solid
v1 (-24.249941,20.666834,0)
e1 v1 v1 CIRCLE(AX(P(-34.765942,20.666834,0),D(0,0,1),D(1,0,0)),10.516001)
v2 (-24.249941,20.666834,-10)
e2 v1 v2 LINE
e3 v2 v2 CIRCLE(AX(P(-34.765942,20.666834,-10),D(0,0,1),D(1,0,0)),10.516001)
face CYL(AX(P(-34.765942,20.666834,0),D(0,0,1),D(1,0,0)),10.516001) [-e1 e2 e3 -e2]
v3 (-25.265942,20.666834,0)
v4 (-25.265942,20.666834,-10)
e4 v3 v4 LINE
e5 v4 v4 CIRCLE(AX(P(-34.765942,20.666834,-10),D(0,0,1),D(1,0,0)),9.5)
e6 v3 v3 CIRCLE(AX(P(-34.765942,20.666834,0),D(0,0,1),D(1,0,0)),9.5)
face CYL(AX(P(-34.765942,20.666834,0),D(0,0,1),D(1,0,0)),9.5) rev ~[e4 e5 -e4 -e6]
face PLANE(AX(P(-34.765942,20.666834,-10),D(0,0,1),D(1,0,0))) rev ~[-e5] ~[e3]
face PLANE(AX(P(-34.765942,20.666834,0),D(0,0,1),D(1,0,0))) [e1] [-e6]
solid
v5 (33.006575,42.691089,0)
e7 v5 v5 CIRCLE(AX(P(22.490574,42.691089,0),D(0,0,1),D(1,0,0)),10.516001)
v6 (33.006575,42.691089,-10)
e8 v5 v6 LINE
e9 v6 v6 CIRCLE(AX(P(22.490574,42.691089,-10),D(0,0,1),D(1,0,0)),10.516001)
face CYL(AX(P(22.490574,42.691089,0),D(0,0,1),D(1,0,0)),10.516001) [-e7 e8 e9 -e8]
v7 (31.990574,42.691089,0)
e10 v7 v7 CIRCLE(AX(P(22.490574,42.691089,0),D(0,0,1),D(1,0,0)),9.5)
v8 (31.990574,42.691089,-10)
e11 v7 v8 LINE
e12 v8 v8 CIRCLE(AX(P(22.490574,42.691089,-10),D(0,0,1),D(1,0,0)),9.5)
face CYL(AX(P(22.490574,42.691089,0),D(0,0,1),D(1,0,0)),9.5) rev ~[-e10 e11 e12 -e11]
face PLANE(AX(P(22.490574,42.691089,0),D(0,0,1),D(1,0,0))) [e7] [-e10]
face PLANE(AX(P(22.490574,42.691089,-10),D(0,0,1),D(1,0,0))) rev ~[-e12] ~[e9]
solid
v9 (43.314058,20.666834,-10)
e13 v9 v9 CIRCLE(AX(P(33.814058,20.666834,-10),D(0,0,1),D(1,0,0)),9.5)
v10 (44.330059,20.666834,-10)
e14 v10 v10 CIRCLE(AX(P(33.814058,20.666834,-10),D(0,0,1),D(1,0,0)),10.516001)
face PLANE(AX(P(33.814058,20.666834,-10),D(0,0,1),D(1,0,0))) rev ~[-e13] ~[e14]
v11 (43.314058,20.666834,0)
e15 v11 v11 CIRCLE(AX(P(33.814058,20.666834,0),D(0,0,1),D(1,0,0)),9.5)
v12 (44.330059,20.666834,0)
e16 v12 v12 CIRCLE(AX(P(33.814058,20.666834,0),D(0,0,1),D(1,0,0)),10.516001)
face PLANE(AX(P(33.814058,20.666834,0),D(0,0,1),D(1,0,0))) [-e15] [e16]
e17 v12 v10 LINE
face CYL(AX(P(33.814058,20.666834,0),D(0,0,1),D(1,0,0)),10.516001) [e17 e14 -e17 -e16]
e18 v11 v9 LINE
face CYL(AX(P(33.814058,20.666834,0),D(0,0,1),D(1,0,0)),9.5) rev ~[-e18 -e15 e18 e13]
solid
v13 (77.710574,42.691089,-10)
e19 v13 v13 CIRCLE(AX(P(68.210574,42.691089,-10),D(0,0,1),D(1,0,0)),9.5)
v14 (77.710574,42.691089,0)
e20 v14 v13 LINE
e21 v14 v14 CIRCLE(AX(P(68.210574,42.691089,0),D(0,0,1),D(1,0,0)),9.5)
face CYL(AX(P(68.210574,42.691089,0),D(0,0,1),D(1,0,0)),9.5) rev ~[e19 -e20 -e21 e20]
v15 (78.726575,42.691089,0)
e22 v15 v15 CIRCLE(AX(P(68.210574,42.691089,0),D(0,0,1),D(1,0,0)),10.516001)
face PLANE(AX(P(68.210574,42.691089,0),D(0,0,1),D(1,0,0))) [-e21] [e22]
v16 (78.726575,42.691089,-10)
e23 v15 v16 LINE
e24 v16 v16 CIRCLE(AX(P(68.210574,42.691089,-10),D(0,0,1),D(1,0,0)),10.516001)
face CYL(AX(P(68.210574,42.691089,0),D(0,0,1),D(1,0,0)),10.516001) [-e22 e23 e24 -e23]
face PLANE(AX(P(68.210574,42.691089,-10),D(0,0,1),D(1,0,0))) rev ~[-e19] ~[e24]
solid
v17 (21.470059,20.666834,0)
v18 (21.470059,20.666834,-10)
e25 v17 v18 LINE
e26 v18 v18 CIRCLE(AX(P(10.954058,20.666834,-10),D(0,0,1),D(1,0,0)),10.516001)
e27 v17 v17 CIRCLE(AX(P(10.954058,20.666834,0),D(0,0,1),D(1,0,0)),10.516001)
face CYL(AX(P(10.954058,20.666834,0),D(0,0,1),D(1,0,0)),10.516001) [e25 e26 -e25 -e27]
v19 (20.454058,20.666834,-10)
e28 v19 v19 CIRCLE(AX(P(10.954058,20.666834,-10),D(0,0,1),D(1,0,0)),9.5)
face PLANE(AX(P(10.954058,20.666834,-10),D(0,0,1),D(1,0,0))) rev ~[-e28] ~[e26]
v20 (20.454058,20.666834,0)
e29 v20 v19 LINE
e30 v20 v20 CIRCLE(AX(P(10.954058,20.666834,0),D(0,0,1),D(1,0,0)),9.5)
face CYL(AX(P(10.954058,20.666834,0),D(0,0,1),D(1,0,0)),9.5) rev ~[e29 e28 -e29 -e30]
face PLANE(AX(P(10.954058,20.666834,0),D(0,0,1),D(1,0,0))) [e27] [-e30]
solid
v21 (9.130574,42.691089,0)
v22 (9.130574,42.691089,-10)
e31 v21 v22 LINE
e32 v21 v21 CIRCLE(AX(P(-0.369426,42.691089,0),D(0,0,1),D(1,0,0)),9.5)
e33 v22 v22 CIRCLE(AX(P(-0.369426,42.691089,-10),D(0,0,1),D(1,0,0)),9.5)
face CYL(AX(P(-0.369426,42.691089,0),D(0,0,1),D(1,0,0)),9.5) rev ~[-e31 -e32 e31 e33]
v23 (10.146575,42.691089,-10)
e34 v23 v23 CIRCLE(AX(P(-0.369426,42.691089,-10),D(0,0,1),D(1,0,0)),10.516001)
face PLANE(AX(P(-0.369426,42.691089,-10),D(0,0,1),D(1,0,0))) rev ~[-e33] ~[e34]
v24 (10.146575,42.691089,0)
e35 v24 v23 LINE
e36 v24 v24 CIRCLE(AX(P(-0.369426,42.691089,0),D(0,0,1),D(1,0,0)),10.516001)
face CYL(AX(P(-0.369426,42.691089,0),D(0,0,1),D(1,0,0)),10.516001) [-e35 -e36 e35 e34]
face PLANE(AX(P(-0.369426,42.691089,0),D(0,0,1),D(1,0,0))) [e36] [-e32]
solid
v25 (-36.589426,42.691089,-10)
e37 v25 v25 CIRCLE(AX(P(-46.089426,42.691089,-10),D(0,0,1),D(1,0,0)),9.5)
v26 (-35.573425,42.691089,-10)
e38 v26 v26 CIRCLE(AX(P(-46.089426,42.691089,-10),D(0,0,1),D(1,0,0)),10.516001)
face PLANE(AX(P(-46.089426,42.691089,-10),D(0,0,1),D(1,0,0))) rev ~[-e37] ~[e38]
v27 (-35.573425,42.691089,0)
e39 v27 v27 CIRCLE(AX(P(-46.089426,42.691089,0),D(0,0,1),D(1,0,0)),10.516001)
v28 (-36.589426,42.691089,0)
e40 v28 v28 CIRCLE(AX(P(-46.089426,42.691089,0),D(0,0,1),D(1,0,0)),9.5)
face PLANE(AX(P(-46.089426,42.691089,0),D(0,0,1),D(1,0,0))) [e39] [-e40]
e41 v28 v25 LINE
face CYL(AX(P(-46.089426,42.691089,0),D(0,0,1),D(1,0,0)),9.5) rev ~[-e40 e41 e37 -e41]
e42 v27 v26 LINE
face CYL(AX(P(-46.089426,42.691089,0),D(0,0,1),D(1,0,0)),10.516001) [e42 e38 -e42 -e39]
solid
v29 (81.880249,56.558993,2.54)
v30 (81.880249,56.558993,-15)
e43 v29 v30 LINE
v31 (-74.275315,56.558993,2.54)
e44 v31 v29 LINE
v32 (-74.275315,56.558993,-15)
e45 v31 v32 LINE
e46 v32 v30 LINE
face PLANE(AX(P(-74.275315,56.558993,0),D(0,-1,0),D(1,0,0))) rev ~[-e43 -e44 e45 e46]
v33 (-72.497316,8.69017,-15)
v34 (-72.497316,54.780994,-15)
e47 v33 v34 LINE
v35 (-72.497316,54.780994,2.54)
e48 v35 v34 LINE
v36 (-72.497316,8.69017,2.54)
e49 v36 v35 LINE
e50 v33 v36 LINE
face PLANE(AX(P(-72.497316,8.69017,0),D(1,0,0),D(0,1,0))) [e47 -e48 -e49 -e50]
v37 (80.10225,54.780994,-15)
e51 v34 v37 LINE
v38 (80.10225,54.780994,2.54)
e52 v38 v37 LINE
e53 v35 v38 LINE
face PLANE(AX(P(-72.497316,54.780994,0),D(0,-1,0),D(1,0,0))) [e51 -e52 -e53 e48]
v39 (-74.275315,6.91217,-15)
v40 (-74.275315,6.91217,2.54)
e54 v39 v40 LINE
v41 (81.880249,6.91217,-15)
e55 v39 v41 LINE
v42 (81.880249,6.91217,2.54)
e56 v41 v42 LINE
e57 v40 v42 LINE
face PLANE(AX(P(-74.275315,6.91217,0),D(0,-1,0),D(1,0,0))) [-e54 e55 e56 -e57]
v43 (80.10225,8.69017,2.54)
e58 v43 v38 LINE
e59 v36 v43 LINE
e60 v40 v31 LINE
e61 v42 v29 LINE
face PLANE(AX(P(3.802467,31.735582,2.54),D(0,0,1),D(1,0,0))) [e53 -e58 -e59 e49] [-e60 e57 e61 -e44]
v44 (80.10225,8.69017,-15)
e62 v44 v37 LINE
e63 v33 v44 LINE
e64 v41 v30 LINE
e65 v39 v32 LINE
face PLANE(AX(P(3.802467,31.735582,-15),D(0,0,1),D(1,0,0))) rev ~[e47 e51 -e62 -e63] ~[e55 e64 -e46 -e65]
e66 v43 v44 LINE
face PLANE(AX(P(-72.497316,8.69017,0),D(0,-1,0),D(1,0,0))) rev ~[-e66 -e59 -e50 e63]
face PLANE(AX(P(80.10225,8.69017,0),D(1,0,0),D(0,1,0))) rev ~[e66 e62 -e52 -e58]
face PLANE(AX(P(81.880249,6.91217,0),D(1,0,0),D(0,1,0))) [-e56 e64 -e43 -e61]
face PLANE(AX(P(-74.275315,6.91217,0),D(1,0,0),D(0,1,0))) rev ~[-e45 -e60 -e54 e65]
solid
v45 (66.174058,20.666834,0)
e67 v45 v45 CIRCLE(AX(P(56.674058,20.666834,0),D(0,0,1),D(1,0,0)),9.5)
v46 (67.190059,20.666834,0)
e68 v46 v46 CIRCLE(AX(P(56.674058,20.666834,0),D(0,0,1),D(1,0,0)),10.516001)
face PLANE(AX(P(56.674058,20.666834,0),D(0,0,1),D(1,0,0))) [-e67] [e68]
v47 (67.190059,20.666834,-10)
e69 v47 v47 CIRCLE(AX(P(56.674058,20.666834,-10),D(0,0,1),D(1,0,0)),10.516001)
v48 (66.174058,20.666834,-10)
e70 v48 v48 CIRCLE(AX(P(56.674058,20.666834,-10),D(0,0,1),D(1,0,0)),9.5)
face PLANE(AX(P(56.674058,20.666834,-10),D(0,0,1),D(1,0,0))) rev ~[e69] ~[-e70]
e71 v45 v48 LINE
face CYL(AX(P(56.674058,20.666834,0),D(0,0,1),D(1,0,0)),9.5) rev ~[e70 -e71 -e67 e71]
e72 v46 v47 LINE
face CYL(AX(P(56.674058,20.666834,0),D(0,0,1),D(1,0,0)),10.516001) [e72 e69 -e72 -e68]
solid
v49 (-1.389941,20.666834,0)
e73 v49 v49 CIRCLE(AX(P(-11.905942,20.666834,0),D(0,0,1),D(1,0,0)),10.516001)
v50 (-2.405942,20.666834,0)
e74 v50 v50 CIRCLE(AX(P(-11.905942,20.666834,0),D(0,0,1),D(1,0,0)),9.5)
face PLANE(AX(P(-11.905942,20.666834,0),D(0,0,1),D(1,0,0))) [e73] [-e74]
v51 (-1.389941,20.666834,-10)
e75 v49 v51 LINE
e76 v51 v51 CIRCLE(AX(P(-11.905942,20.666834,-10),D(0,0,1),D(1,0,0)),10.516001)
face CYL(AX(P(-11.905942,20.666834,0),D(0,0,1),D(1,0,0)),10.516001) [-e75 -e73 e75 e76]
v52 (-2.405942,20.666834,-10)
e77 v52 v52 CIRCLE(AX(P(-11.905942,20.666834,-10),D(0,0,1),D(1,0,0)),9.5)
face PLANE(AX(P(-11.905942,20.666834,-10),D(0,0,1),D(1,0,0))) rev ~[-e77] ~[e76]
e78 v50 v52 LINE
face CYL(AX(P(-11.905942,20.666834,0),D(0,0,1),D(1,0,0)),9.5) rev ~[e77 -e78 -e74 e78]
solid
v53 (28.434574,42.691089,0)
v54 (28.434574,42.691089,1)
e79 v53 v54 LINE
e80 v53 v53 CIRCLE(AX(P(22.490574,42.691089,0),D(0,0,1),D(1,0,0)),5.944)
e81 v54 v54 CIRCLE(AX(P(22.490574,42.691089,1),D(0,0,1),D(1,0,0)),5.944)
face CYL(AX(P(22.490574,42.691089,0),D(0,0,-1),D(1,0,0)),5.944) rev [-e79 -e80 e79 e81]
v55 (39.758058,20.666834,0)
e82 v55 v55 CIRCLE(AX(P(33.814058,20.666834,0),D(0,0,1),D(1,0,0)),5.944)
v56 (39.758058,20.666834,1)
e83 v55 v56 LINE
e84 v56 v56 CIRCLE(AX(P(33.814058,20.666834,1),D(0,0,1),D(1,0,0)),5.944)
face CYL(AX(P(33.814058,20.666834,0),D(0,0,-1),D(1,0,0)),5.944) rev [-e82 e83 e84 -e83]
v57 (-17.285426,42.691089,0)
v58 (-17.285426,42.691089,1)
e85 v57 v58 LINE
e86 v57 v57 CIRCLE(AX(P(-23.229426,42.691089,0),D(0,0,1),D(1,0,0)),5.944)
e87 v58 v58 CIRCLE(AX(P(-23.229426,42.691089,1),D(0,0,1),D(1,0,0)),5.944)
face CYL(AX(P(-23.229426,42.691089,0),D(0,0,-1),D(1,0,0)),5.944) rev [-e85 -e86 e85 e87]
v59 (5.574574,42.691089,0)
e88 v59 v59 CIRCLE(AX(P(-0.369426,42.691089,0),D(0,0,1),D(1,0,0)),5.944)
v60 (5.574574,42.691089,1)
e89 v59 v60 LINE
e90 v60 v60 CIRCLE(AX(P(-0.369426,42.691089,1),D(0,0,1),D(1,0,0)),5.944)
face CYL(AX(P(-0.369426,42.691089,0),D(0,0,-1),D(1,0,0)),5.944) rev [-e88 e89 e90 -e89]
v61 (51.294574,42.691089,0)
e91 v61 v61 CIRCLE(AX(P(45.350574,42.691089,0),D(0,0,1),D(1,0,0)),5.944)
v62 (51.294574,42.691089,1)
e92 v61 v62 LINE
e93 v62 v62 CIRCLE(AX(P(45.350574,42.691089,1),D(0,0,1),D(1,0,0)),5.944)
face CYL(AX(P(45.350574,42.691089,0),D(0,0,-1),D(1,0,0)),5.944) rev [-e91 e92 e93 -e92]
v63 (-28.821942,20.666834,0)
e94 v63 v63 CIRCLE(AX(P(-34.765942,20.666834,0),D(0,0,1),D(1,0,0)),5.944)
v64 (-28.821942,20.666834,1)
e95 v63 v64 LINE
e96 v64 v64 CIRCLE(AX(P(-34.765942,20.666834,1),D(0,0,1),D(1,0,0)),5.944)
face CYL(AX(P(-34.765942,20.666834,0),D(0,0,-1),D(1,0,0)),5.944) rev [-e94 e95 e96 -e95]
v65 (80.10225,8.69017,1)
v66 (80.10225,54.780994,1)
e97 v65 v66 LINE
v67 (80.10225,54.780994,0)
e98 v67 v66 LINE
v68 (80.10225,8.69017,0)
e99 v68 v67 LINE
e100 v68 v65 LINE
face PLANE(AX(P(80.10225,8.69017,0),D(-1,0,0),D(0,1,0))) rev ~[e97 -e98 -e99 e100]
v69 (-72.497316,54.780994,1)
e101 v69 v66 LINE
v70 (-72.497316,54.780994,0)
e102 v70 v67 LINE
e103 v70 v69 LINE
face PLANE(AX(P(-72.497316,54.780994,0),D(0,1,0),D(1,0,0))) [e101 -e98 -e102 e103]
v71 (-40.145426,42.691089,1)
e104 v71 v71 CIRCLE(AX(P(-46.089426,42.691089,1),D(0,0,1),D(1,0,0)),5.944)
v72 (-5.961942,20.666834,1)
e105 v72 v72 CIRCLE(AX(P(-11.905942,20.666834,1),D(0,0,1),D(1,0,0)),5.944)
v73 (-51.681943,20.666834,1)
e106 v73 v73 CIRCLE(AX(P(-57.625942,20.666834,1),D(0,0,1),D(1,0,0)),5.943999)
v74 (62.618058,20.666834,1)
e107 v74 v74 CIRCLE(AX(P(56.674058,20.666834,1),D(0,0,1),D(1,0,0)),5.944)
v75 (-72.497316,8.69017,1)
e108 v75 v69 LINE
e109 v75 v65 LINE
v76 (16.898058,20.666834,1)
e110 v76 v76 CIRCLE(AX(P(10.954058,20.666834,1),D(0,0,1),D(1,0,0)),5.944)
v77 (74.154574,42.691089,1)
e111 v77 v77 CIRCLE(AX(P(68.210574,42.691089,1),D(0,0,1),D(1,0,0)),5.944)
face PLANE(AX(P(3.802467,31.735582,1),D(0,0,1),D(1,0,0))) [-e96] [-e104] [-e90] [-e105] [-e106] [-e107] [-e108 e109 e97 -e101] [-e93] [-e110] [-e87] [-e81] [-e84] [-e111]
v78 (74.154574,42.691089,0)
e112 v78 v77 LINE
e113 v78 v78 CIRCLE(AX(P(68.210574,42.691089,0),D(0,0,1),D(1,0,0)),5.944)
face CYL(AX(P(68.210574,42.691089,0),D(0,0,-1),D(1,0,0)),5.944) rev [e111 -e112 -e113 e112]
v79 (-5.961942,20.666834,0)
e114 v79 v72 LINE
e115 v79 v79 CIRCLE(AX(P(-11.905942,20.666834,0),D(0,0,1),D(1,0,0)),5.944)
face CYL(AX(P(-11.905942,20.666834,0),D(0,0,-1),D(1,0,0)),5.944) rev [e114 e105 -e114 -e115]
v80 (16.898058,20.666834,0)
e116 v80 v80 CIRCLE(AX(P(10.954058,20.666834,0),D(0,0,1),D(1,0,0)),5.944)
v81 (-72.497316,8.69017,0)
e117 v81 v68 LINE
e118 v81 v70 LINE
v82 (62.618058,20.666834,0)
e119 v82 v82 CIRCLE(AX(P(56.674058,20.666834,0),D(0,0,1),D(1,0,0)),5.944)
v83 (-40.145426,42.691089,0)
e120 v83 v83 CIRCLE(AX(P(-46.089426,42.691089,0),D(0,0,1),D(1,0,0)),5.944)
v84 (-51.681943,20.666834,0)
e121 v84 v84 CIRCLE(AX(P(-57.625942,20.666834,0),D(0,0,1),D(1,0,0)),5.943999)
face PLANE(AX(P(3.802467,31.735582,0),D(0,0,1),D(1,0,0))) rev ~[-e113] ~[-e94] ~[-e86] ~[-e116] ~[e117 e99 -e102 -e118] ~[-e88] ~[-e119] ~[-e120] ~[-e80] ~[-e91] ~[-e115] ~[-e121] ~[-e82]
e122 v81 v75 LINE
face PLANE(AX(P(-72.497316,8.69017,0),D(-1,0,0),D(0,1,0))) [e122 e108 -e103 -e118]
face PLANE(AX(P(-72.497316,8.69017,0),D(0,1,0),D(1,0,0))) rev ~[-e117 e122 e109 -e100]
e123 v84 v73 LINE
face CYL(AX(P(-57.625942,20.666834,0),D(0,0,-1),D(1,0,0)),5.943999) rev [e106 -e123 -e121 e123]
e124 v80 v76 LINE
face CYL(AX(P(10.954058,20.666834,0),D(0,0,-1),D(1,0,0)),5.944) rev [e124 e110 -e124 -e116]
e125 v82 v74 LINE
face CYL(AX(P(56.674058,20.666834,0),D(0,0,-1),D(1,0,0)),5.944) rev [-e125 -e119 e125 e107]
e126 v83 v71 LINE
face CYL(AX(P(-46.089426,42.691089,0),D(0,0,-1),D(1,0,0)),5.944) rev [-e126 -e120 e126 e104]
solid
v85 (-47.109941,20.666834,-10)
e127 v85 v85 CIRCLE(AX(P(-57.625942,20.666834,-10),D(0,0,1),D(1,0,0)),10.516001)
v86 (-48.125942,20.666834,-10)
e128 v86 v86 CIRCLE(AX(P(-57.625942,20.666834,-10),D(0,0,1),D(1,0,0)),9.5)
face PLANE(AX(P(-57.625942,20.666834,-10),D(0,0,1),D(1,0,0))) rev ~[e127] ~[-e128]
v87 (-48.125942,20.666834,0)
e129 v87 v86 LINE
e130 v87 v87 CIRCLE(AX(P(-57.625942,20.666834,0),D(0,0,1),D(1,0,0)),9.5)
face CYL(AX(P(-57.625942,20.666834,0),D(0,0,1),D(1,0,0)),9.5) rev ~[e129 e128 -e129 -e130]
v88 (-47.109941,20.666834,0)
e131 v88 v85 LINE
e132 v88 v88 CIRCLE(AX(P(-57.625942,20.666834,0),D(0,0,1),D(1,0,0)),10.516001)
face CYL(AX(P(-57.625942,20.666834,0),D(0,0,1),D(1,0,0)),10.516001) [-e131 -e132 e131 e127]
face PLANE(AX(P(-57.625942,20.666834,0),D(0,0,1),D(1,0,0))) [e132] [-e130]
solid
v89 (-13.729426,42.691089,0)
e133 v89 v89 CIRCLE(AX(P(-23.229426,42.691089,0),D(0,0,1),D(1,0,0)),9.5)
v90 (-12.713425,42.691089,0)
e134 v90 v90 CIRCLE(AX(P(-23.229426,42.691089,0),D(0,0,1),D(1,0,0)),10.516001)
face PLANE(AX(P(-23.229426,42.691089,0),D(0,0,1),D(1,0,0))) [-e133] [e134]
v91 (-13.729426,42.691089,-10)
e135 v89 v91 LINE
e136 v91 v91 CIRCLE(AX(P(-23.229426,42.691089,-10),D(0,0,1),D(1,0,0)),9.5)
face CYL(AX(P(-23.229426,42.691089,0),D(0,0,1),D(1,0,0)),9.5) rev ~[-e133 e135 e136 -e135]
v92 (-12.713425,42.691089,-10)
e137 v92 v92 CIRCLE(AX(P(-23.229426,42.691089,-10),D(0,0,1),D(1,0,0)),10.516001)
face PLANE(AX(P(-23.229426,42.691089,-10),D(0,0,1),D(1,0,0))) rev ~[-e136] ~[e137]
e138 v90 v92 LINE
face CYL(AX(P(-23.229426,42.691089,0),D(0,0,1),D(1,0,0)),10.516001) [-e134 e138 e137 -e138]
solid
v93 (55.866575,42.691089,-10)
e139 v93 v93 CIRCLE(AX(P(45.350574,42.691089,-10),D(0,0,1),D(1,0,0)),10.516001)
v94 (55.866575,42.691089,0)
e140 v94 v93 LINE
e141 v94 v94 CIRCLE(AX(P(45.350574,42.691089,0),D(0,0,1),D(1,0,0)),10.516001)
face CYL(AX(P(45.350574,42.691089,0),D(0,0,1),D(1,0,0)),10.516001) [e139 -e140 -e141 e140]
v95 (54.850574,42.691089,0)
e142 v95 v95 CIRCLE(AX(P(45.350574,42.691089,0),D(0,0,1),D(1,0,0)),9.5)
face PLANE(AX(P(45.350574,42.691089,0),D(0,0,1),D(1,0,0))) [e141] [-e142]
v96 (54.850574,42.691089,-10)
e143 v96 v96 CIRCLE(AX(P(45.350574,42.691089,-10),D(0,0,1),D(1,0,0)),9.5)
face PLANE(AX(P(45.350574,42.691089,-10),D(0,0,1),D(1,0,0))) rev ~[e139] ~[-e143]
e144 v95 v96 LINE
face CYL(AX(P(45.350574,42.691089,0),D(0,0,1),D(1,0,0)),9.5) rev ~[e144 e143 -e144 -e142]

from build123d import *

# Parameters (mm, degrees)
F0_W     = 156.1555638909
F0_H     = 49.64682227
F0_W_2   = 152.5995656848
F0_H_2   = 46.0908240639
F1_DEPTH = 2.54
F0_R     = 10.5160009116
F0_R_2   = 9.5
F2_DEPTH = 10
F0_R_3   = 5.944
F0_R_4   = 5.9439986944
F3_DEPTH = 1
F4_DEPTH = 15


with BuildPart() as f1:
    # F0 (on Top) → F1 (new body)
    with BuildSketch(Plane.XY):
        with Locations((3.8024671376, 31.7355815787)):
            Rectangle(F0_W, F0_H)
        with Locations((3.8024671376, 31.7355815787)):
            Rectangle(F0_W_2, F0_H_2, mode=Mode.SUBTRACT)
    extrude(amount=F1_DEPTH)

    # F0 (on Top) → F4 (join)
    with BuildSketch(Plane.XY):
        with Locations((3.8024671376, 31.7355815787)):
            Rectangle(F0_W, F0_H)
        with Locations((3.8024671376, 31.7355815787)):
            Rectangle(F0_W_2, F0_H_2, mode=Mode.SUBTRACT)
    extrude(amount=-F4_DEPTH)


with BuildPart() as f2:
    # F0 (on Top) → F2 (new body)
    with BuildSketch(Plane.XY):
        with Locations((-46.0894259106, 42.6910893638)):
            Circle(F0_R)
        with Locations((-46.0894259106, 42.6910893638)):
            Circle(F0_R_2, mode=Mode.SUBTRACT)
    extrude(amount=-F2_DEPTH)


with BuildPart() as f2b:
    # F0 (on Top) → F2, piece 2 (new body)
    with BuildSketch(Plane.XY):
        with Locations((-57.6259419322, 20.666833967)):
            Circle(F0_R)
        with Locations((-57.6259419322, 20.666833967)):
            Circle(F0_R_2, mode=Mode.SUBTRACT)
    extrude(amount=-F2_DEPTH)


with BuildPart() as f2c:
    # F0 (on Top) → F2, piece 3 (new body)
    with BuildSketch(Plane.XY):
        with Locations((-34.7659419322, 20.666833967)):
            Circle(F0_R)
        with Locations((-34.7659419322, 20.666833967)):
            Circle(F0_R_2, mode=Mode.SUBTRACT)
    extrude(amount=-F2_DEPTH)


with BuildPart() as f2d:
    # F0 (on Top) → F2, piece 4 (new body)
    with BuildSketch(Plane.XY):
        with Locations((-23.2294259106, 42.6910893638)):
            Circle(F0_R)
        with Locations((-23.2294259106, 42.6910893638)):
            Circle(F0_R_2, mode=Mode.SUBTRACT)
    extrude(amount=-F2_DEPTH)


with BuildPart() as f2e:
    # F0 (on Top) → F2, piece 5 (new body)
    with BuildSketch(Plane.XY):
        with Locations((-0.3694259106, 42.6910893638)):
            Circle(F0_R)
        with Locations((-0.3694259106, 42.6910893638)):
            Circle(F0_R_2, mode=Mode.SUBTRACT)
    extrude(amount=-F2_DEPTH)


with BuildPart() as f2f:
    # F0 (on Top) → F2, piece 6 (new body)
    with BuildSketch(Plane.XY):
        with Locations((-11.9059419322, 20.666833967)):
            Circle(F0_R)
        with Locations((-11.9059419322, 20.666833967)):
            Circle(F0_R_2, mode=Mode.SUBTRACT)
    extrude(amount=-F2_DEPTH)


with BuildPart() as f2g:
    # F0 (on Top) → F2, piece 7 (new body)
    with BuildSketch(Plane.XY):
        with Locations((10.9540580678, 20.666833967)):
            Circle(F0_R)
        with Locations((10.9540580678, 20.666833967)):
            Circle(F0_R_2, mode=Mode.SUBTRACT)
    extrude(amount=-F2_DEPTH)


with BuildPart() as f2h:
    # F0 (on Top) → F2, piece 8 (new body)
    with BuildSketch(Plane.XY):
        with Locations((22.4905740894, 42.6910893638)):
            Circle(F0_R)
        with Locations((22.4905740894, 42.6910893638)):
            Circle(F0_R_2, mode=Mode.SUBTRACT)
    extrude(amount=-F2_DEPTH)


with BuildPart() as f2i:
    # F0 (on Top) → F2, piece 9 (new body)
    with BuildSketch(Plane.XY):
        with Locations((33.8140580678, 20.666833967)):
            Circle(F0_R)
        with Locations((33.8140580678, 20.666833967)):
            Circle(F0_R_2, mode=Mode.SUBTRACT)
    extrude(amount=-F2_DEPTH)


with BuildPart() as f2j:
    # F0 (on Top) → F2, piece 10 (new body)
    with BuildSketch(Plane.XY):
        with Locations((45.3505740894, 42.6910893638)):
            Circle(F0_R)
        with Locations((45.3505740894, 42.6910893638)):
            Circle(F0_R_2, mode=Mode.SUBTRACT)
    extrude(amount=-F2_DEPTH)


with BuildPart() as f2k:
    # F0 (on Top) → F2, piece 11 (new body)
    with BuildSketch(Plane.XY):
        with Locations((56.6740580678, 20.666833967)):
            Circle(F0_R)
        with Locations((56.6740580678, 20.666833967)):
            Circle(F0_R_2, mode=Mode.SUBTRACT)
    extrude(amount=-F2_DEPTH)


with BuildPart() as f2l:
    # F0 (on Top) → F2, piece 12 (new body)
    with BuildSketch(Plane.XY):
        with Locations((68.2105740894, 42.6910893638)):
            Circle(F0_R)
        with Locations((68.2105740894, 42.6910893638)):
            Circle(F0_R_2, mode=Mode.SUBTRACT)
    extrude(amount=-F2_DEPTH)


with BuildPart() as f3:
    # F0 (on Top) → F3 (new body)
    with BuildSketch(Plane.XY):
        with Locations((3.8024671376, 31.7355815787)):
            Rectangle(F0_W_2, F0_H_2)
        with Locations((-57.6259419322, 20.666833967)):
            Circle(F0_R, mode=Mode.SUBTRACT)
        with Locations((-34.7659419322, 20.666833967)):
            Circle(F0_R, mode=Mode.SUBTRACT)
        with Locations((-11.9059419322, 20.666833967)):
            Circle(F0_R, mode=Mode.SUBTRACT)
        with Locations((10.9540580678, 20.666833967)):
            Circle(F0_R, mode=Mode.SUBTRACT)
        with Locations((33.8140580678, 20.666833967)):
            Circle(F0_R, mode=Mode.SUBTRACT)
        with Locations((56.6740580678, 20.666833967)):
            Circle(F0_R, mode=Mode.SUBTRACT)
        with Locations((-46.0894259106, 42.6910893638)):
            Circle(F0_R, mode=Mode.SUBTRACT)
        with Locations((-23.2294259106, 42.6910893638)):
            Circle(F0_R, mode=Mode.SUBTRACT)
        with Locations((-0.3694259106, 42.6910893638)):
            Circle(F0_R, mode=Mode.SUBTRACT)
        with Locations((22.4905740894, 42.6910893638)):
            Circle(F0_R, mode=Mode.SUBTRACT)
        with Locations((45.3505740894, 42.6910893638)):
            Circle(F0_R, mode=Mode.SUBTRACT)
        with Locations((68.2105740894, 42.6910893638)):
            Circle(F0_R, mode=Mode.SUBTRACT)
        with Locations((-46.0894259106, 42.6910893638)):
            Circle(F0_R)
        with Locations((-46.0894259106, 42.6910893638)):
            Circle(F0_R_2, mode=Mode.SUBTRACT)
        with Locations((-57.6259419322, 20.666833967)):
            Circle(F0_R)
        with Locations((-57.6259419322, 20.666833967)):
            Circle(F0_R_2, mode=Mode.SUBTRACT)
        with Locations((-34.7659419322, 20.666833967)):
            Circle(F0_R)
        with Locations((-34.7659419322, 20.666833967)):
            Circle(F0_R_2, mode=Mode.SUBTRACT)
        with Locations((-23.2294259106, 42.6910893638)):
            Circle(F0_R)
        with Locations((-23.2294259106, 42.6910893638)):
            Circle(F0_R_2, mode=Mode.SUBTRACT)
        with Locations((-0.3694259106, 42.6910893638)):
            Circle(F0_R)
        with Locations((-0.3694259106, 42.6910893638)):
            Circle(F0_R_2, mode=Mode.SUBTRACT)
        with Locations((10.9540580678, 20.666833967)):
            Circle(F0_R)
        with Locations((10.9540580678, 20.666833967)):
            Circle(F0_R_2, mode=Mode.SUBTRACT)
        with Locations((-11.9059419322, 20.666833967)):
            Circle(F0_R)
        with Locations((-11.9059419322, 20.666833967)):
            Circle(F0_R_2, mode=Mode.SUBTRACT)
        with Locations((56.6740580678, 20.666833967)):
            Circle(F0_R)
        with Locations((56.6740580678, 20.666833967)):
            Circle(F0_R_2, mode=Mode.SUBTRACT)
        with Locations((45.3505740894, 42.6910893638)):
            Circle(F0_R)
        with Locations((45.3505740894, 42.6910893638)):
            Circle(F0_R_2, mode=Mode.SUBTRACT)
        with Locations((22.4905740894, 42.6910893638)):
            Circle(F0_R)
        with Locations((22.4905740894, 42.6910893638)):
            Circle(F0_R_2, mode=Mode.SUBTRACT)
        with Locations((33.8140580678, 20.666833967)):
            Circle(F0_R)
        with Locations((33.8140580678, 20.666833967)):
            Circle(F0_R_2, mode=Mode.SUBTRACT)
        with Locations((68.2105740894, 42.6910893638)):
            Circle(F0_R)
        with Locations((68.2105740894, 42.6910893638)):
            Circle(F0_R_2, mode=Mode.SUBTRACT)
        with Locations((-46.0894259106, 42.6910893638)):
            Circle(F0_R_2)
        with Locations((-46.0894259106, 42.6910893638)):
            Circle(F0_R_3, mode=Mode.SUBTRACT)
        with Locations((-23.2294259106, 42.6910893638)):
            Circle(F0_R_2)
        with Locations((-23.2294259106, 42.6910893638)):
            Circle(F0_R_3, mode=Mode.SUBTRACT)
        with Locations((-57.6259419322, 20.666833967)):
            Circle(F0_R_2)
        with Locations((-57.6259419322, 20.666833967)):
            Circle(F0_R_4, mode=Mode.SUBTRACT)
        with Locations((-34.7659419322, 20.666833967)):
            Circle(F0_R_2)
        with Locations((-34.7659419322, 20.666833967)):
            Circle(F0_R_3, mode=Mode.SUBTRACT)
        with Locations((-11.9059419322, 20.666833967)):
            Circle(F0_R_2)
        with Locations((-11.9059419322, 20.666833967)):
            Circle(F0_R_3, mode=Mode.SUBTRACT)
        with Locations((-0.3694259106, 42.6910893638)):
            Circle(F0_R_2)
        with Locations((-0.3694259106, 42.6910893638)):
            Circle(F0_R_3, mode=Mode.SUBTRACT)
        with Locations((22.4905740894, 42.6910893638)):
            Circle(F0_R_2)
        with Locations((22.4905740894, 42.6910893638)):
            Circle(F0_R_3, mode=Mode.SUBTRACT)
        with Locations((10.9540580678, 20.666833967)):
            Circle(F0_R_2)
        with Locations((10.9540580678, 20.666833967)):
            Circle(F0_R_3, mode=Mode.SUBTRACT)
        with Locations((33.8140580678, 20.666833967)):
            Circle(F0_R_2)
        with Locations((33.8140580678, 20.666833967)):
            Circle(F0_R_3, mode=Mode.SUBTRACT)
        with Locations((45.3505740894, 42.6910893638)):
            Circle(F0_R_2)
        with Locations((45.3505740894, 42.6910893638)):
            Circle(F0_R_3, mode=Mode.SUBTRACT)
        with Locations((56.6740580678, 20.666833967)):
            Circle(F0_R_2)
        with Locations((56.6740580678, 20.666833967)):
            Circle(F0_R_3, mode=Mode.SUBTRACT)
        with Locations((68.2105740894, 42.6910893638)):
            Circle(F0_R_2)
        with Locations((68.2105740894, 42.6910893638)):
            Circle(F0_R_3, mode=Mode.SUBTRACT)
    extrude(amount=F3_DEPTH)


solid = Compound([f1.part, f2.part, f2b.part, f2c.part, f2d.part, f2e.part, f2f.part, f2g.part, f2h.part, f2i.part, f2j.part, f2k.part, f2l.part, f3.part])
